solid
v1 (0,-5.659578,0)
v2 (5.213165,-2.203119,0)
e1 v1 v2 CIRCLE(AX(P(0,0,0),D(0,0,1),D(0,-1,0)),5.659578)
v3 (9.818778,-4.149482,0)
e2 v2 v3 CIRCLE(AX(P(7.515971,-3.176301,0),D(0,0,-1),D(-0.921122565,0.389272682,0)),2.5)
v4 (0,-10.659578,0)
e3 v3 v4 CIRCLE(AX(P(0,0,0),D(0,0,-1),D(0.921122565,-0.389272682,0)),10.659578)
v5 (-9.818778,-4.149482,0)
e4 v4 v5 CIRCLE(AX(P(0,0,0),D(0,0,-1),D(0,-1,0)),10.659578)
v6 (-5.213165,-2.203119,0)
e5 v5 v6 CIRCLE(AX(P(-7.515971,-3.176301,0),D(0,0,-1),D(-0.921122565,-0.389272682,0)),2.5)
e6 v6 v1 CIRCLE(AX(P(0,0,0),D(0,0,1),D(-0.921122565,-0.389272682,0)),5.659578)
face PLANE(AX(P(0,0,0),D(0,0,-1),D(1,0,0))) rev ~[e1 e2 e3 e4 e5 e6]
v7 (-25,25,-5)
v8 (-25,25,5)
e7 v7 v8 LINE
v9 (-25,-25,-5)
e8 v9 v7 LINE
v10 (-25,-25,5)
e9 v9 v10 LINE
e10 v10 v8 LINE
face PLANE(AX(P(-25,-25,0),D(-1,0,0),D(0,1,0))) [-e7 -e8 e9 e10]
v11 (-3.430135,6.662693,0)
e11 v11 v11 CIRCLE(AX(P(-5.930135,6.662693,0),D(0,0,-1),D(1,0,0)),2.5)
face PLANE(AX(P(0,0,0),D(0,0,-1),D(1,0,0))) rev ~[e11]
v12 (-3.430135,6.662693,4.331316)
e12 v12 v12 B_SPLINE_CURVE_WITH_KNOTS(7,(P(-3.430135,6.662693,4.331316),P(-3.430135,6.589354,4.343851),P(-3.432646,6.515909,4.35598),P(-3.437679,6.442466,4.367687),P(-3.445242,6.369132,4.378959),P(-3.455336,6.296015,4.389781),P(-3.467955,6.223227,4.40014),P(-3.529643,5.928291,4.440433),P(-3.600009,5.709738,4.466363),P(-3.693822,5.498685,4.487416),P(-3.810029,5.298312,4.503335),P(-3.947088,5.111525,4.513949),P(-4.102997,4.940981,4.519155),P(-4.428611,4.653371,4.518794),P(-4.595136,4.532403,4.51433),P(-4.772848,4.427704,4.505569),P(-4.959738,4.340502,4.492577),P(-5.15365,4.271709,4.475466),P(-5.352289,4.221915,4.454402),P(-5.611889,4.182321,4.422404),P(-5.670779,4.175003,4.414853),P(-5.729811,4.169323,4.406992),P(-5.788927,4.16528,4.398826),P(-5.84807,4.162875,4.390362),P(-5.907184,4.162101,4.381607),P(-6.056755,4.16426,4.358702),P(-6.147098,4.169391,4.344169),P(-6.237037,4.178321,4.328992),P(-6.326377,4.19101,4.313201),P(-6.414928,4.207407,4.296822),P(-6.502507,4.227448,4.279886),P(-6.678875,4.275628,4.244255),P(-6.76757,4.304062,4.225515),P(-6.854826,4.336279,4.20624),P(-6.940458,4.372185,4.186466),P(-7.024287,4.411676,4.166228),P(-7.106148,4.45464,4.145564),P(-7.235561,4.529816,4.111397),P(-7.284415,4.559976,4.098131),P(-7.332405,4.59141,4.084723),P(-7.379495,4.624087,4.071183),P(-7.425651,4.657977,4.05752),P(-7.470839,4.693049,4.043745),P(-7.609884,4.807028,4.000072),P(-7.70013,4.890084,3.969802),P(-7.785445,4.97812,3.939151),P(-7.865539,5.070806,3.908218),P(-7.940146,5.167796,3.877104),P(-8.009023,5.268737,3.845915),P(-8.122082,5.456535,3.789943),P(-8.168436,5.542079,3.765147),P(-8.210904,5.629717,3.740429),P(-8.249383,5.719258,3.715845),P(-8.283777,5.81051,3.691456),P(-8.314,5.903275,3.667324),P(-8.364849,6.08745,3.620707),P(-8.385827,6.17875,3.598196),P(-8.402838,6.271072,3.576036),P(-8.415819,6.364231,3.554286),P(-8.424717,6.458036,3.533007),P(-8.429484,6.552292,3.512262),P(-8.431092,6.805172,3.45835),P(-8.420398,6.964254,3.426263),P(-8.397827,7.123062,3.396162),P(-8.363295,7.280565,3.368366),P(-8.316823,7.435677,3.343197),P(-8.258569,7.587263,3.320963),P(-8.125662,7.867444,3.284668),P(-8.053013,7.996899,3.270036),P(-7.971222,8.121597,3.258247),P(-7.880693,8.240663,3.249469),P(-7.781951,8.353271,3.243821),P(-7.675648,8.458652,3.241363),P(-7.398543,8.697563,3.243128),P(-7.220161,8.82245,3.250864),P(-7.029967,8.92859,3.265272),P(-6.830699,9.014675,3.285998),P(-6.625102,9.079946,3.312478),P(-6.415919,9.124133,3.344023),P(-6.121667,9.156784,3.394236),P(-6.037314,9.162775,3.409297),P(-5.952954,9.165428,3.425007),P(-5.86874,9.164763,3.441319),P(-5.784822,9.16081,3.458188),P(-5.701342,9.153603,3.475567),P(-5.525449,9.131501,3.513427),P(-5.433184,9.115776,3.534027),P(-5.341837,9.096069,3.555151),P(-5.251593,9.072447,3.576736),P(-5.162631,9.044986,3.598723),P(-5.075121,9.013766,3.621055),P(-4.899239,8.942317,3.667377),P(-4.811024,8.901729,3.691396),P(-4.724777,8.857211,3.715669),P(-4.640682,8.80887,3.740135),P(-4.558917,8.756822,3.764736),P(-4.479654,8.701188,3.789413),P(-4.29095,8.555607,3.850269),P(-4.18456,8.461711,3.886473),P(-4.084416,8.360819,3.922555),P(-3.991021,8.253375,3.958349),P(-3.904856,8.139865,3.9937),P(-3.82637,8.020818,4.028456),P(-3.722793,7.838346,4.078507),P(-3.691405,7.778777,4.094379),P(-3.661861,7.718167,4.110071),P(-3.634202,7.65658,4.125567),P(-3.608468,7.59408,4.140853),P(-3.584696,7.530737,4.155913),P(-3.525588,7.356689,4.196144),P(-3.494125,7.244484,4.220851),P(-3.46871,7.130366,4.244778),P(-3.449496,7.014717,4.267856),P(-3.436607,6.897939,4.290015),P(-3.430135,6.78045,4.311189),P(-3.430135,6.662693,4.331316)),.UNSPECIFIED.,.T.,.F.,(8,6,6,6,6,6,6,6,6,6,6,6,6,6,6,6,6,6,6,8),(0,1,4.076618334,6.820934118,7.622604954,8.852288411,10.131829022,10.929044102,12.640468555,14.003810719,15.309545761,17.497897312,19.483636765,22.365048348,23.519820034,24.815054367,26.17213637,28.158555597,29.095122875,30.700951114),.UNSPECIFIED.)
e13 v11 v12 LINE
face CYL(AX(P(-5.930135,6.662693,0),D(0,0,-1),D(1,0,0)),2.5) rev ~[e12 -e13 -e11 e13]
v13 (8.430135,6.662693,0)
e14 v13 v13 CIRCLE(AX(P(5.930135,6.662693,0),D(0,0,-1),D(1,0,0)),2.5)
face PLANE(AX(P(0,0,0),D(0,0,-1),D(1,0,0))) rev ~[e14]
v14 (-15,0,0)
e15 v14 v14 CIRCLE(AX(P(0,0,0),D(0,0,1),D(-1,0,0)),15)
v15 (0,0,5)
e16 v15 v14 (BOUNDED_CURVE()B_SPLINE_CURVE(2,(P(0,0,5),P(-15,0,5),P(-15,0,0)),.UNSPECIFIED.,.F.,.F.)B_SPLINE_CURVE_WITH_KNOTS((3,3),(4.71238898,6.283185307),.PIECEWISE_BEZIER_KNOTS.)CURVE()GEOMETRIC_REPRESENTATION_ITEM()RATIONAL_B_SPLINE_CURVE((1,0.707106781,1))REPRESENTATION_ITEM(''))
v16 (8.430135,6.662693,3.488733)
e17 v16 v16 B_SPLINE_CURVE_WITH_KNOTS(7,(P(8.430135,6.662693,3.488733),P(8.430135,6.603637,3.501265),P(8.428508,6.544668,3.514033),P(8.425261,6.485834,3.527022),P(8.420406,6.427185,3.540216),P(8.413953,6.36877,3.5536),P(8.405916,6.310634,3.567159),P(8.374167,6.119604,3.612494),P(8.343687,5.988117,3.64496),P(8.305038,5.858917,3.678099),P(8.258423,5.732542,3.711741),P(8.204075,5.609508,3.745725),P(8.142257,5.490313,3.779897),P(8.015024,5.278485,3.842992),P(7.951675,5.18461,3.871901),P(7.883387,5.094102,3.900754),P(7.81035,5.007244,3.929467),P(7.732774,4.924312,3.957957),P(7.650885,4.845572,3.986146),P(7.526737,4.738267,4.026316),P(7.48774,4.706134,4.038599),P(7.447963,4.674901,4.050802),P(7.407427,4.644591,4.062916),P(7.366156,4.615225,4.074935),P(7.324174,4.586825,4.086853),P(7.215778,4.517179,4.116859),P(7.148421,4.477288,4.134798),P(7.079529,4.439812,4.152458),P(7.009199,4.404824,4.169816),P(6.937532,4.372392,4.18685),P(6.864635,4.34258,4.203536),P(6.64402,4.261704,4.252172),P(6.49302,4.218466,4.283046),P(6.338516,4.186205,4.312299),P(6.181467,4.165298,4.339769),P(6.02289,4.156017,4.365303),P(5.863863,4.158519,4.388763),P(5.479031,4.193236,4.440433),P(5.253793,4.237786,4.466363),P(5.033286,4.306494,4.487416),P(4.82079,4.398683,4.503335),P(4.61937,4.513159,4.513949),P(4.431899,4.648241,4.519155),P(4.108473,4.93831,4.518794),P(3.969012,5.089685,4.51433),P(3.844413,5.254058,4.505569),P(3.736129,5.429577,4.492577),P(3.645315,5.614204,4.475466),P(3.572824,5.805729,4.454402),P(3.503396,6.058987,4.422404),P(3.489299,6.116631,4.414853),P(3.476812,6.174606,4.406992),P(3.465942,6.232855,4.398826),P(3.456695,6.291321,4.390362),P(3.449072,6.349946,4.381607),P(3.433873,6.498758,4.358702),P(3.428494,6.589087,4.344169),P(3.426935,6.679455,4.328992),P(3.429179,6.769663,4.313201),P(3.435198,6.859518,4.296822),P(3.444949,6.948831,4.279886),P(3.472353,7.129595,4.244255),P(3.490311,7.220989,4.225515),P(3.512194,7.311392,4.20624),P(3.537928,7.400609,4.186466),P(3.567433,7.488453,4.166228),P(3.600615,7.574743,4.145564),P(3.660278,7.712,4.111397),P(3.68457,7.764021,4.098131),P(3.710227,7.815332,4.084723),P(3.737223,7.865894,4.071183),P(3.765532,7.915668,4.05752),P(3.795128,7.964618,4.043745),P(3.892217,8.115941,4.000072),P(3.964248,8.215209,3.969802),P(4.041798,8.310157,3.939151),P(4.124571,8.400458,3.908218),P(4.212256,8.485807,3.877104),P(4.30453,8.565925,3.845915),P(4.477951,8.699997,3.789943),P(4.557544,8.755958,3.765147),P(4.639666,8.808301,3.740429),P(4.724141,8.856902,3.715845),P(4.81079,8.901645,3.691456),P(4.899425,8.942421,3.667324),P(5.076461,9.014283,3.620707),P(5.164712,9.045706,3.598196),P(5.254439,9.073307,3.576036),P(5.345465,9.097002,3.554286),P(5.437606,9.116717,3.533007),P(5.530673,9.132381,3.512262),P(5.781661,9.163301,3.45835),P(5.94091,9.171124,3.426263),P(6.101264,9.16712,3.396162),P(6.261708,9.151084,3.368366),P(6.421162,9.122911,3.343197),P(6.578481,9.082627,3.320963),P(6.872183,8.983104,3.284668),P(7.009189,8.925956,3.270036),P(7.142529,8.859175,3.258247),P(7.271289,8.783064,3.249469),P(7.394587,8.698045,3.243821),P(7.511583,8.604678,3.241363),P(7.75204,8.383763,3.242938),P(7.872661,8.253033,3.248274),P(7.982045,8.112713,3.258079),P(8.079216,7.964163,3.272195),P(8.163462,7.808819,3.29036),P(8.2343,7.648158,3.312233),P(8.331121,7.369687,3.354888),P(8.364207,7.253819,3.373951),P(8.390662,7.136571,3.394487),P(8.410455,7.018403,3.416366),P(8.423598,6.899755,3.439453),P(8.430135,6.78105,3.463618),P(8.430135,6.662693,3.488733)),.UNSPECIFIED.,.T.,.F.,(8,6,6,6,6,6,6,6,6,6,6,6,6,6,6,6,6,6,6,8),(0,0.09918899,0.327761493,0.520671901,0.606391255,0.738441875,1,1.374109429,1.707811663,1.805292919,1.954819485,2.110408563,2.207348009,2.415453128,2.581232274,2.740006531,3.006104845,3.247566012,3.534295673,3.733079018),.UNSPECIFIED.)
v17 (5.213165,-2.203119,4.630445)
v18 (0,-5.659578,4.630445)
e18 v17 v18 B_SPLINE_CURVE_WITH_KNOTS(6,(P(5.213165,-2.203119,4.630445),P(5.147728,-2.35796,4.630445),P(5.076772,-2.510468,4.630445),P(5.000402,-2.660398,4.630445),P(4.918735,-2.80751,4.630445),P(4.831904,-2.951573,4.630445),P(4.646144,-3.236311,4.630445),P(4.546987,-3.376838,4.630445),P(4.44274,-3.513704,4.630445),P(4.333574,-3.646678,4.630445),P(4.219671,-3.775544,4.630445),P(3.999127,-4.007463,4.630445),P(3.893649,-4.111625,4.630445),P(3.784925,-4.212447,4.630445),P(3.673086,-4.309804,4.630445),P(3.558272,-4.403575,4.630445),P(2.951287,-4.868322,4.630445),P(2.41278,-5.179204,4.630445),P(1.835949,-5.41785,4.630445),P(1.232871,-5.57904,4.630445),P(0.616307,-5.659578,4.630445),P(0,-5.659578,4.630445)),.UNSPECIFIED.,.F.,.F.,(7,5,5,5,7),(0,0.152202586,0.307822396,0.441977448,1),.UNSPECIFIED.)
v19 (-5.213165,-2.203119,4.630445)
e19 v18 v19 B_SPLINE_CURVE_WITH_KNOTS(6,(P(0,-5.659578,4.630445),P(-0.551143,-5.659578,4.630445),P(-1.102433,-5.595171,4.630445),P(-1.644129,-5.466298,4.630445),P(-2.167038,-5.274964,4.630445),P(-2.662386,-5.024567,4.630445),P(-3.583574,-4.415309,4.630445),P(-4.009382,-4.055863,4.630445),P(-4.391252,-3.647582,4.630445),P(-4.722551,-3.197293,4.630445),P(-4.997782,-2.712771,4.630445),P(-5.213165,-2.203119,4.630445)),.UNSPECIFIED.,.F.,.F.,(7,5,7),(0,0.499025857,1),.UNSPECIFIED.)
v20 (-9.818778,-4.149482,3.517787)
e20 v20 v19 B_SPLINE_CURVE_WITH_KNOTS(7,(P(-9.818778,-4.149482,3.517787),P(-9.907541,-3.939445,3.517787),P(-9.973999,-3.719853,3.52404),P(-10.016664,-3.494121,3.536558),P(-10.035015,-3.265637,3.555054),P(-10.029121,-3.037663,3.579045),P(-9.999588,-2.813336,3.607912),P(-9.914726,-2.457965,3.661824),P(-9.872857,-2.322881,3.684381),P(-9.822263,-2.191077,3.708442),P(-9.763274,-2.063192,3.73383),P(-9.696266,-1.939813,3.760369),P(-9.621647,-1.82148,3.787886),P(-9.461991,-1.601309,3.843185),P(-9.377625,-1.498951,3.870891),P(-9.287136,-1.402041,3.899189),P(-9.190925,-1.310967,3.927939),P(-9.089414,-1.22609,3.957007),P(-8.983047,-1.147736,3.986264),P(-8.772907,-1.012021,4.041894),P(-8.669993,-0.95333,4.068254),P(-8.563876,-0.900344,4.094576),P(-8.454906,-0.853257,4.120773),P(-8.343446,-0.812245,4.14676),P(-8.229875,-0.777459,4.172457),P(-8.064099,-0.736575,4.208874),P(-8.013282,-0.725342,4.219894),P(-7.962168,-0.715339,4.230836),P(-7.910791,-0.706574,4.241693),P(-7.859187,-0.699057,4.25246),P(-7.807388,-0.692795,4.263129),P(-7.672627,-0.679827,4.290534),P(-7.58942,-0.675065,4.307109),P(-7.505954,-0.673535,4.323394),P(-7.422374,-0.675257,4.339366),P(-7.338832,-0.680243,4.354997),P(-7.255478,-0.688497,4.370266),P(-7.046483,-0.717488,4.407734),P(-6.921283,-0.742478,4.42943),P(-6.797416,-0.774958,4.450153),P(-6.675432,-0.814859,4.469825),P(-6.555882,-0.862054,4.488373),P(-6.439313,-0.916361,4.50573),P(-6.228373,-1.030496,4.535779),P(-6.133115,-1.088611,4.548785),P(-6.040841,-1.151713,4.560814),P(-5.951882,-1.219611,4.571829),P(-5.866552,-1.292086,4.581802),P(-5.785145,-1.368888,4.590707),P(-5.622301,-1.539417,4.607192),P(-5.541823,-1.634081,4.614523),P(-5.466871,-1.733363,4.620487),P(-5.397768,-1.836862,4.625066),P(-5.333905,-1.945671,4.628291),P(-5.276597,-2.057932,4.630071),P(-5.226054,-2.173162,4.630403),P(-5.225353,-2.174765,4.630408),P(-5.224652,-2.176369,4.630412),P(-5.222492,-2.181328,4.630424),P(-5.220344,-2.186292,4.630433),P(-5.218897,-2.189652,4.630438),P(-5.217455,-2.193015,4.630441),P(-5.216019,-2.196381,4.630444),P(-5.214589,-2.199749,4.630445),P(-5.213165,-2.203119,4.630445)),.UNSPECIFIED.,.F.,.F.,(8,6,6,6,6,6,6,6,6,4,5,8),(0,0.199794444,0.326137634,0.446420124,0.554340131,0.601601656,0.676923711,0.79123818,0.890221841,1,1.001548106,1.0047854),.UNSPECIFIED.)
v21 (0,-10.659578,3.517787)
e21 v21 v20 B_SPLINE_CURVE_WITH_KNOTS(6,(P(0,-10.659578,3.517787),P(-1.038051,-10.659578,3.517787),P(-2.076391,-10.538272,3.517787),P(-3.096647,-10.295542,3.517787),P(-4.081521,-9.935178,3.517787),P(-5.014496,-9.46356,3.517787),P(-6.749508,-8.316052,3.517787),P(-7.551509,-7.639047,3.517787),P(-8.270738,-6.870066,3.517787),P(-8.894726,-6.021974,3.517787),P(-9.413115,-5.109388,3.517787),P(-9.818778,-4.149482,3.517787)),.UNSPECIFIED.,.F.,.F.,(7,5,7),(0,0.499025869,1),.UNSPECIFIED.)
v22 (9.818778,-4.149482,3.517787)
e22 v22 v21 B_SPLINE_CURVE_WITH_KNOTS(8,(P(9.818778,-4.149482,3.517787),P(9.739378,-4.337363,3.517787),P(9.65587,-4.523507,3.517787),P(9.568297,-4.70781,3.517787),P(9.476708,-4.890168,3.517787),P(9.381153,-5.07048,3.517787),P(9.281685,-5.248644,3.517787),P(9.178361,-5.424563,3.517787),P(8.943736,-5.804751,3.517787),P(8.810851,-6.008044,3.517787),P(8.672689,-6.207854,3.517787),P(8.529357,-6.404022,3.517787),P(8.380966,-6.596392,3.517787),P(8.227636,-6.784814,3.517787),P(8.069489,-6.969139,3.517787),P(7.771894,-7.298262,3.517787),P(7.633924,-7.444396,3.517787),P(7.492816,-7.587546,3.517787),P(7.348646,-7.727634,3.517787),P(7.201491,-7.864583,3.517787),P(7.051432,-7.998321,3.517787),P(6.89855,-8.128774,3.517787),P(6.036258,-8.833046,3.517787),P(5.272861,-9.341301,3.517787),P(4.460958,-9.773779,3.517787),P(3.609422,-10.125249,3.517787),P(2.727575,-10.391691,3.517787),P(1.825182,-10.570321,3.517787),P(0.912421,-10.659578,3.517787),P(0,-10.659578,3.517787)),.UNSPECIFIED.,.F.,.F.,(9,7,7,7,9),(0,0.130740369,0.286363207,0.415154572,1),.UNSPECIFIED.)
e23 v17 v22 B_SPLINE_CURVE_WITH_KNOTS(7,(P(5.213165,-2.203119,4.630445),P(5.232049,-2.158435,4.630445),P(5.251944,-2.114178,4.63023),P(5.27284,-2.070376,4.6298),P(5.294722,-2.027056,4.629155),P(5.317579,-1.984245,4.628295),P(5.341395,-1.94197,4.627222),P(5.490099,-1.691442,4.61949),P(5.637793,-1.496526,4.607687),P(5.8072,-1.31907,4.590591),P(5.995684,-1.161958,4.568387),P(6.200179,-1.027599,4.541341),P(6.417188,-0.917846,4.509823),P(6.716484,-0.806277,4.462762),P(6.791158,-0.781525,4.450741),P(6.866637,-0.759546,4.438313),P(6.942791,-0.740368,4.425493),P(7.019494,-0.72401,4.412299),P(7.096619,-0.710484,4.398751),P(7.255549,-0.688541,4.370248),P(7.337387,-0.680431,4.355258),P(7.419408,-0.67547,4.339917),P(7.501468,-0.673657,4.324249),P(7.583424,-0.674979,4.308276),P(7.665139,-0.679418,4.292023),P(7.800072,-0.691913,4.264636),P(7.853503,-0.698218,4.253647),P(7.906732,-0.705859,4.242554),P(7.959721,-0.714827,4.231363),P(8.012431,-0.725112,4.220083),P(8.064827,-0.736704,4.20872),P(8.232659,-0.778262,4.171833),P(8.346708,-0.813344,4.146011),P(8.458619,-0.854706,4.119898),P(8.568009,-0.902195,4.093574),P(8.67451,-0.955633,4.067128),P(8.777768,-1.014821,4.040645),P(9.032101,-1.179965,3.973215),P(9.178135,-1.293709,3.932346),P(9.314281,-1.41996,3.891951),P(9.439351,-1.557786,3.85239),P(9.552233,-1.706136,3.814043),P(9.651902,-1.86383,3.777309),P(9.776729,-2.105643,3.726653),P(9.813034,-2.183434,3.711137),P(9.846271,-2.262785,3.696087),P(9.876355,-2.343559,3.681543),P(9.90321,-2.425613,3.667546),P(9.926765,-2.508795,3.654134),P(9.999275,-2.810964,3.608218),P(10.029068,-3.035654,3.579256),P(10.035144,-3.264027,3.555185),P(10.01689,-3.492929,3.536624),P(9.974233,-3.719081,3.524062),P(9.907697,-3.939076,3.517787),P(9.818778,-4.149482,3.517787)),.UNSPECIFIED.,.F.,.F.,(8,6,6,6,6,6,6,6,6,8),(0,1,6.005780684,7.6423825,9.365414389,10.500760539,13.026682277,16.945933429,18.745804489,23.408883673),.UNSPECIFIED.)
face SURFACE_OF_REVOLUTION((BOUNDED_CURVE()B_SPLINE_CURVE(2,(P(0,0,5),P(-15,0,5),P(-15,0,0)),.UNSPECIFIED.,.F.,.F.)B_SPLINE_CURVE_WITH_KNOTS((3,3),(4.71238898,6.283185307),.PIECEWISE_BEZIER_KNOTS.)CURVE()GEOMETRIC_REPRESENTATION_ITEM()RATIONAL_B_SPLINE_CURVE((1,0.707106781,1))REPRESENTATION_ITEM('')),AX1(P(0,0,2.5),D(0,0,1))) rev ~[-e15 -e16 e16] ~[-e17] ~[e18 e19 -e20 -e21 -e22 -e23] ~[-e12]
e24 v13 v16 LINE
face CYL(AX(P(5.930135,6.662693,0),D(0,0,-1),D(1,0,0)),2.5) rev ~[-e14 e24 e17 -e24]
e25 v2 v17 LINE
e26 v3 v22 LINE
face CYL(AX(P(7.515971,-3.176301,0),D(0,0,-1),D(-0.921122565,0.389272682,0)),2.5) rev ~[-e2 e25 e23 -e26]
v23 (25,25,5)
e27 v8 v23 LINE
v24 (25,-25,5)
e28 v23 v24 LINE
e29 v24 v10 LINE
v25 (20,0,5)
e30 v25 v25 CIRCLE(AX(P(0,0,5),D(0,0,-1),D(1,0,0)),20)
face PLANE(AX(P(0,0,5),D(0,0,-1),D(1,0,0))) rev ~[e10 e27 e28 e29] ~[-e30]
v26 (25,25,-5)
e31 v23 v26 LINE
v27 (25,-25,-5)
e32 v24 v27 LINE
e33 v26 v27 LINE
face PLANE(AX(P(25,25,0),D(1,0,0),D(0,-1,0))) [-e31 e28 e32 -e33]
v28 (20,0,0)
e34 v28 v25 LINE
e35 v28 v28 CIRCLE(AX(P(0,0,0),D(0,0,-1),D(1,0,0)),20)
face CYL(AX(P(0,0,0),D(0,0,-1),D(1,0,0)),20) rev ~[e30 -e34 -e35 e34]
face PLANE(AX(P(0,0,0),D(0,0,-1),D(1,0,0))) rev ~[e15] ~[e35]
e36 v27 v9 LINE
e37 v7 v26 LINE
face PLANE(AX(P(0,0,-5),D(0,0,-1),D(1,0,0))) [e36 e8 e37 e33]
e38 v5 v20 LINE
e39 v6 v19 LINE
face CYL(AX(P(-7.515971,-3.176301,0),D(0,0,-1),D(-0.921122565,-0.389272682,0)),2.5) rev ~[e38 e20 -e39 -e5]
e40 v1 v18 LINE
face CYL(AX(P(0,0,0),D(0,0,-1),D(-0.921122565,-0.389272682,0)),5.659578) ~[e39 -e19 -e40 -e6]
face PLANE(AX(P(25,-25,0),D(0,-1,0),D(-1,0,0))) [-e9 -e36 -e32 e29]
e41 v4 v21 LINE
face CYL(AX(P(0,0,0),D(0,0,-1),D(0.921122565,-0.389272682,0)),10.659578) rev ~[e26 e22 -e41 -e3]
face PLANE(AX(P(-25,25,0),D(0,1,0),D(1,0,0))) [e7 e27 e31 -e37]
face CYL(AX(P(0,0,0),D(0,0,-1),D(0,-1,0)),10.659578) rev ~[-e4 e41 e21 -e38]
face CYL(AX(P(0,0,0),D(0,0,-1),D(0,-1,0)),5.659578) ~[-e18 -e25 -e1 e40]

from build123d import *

# Parameters (mm, degrees)
F2_R     = 2.5
F3_DEPTH = 25
F4_R     = 20
F4_R_2   = 15
F4_R_3   = 2.5
F5_DEPTH = 5
F6_DEPTH = 5


with BuildPart() as f1:
    # F0 (on Front) → F1 (revolve)
    with BuildSketch(Plane.XZ):
        with BuildLine():
            Line((0, 0), (0, 5))
            add(Edge.make_bspline(
                [(0, 5), (-15, 5), (-15, 0)],
                knots=[4.7123889804, 4.7123889804, 4.7123889804, 6.2831853072, 6.2831853072, 6.2831853072], degree=2, weights=[1, 0.7071067812, 1]))
            Line((-15, 0), (0, 0))
        make_face()
    revolve(axis=Axis((0, 0, 2.5), (0, 0, 1)))

    # F2 (on face) → F3 (cut)
    with BuildSketch(Plane(origin=(0, 0, 0), x_dir=(1, 0, 0), z_dir=(0, 0, -1))):
        with Locations((5.9301354922, -6.6626928747)):
            Circle(F2_R)
        with BuildLine():
            ThreePointArc((-5.2131647244, 2.2031189874), (-3.1274667568, 4.7169663346), (0, 5.6595776977))
            ThreePointArc((0, 5.6595776977), (3.1274667568, 4.7169663346), (5.2131647244, 2.2031189874))
            ThreePointArc((5.2131647244, 2.2031189874), (8.4891528404, 0.8734942796), (9.8187775482, 4.1494823956))
            ThreePointArc((9.8187775482, 4.1494823956), (5.8904527284, 8.8842086506), (0, 10.6595776977))
            ThreePointArc((0, 10.6595776977), (-5.8904527284, 8.8842086506), (-9.8187775482, 4.1494823956))
            ThreePointArc((-9.8187775482, 4.1494823956), (-8.4891528404, 0.8734942796), (-5.2131647244, 2.2031189874))
        make_face()
        with Locations((-5.9301354922, -6.6626928747)):
            Circle(F2_R)
    extrude(amount=-F3_DEPTH, mode=Mode.SUBTRACT)

    # F4 (on face) → F5 (join)
    with BuildSketch(Plane(origin=(0, 0, 0), x_dir=(1, 0, 0), z_dir=(0, 0, -1))):
        Polygon((-25, -25), (0, -25), (25, -25), (25, 0), (25, 25), (0, 25), (-25, 25), (-25, 0), align=None)
        Circle(F4_R, mode=Mode.SUBTRACT)
        Circle(F4_R)
        Circle(F4_R_2, mode=Mode.SUBTRACT)
        Circle(F4_R_2)
        with Locations((-5.9301354922, -6.6626928747)):
            Circle(F4_R_3, mode=Mode.SUBTRACT)
        with Locations((5.9301354922, -6.6626928747)):
            Circle(F4_R_3, mode=Mode.SUBTRACT)
        with BuildLine():
            ThreePointArc((-5.2131647244, 2.2031189874), (-8.4891528404, 0.8734942796), (-9.8187775482, 4.1494823956))
            ThreePointArc((-9.8187775482, 4.1494823956), (0, 10.6595776977), (9.8187775482, 4.1494823956))
            ThreePointArc((9.8187775482, 4.1494823956), (8.4891528404, 0.8734942796), (5.2131647244, 2.2031189874))
            ThreePointArc((5.2131647244, 2.2031189874), (0, 5.6595776977), (-5.2131647244, 2.2031189874))
        make_face(mode=Mode.SUBTRACT)
        with BuildLine():
            ThreePointArc((9.8187775482, 4.1494823956), (0, 10.6595776977), (-9.8187775482, 4.1494823956))
            ThreePointArc((-9.8187775482, 4.1494823956), (-8.4891528404, 0.8734942796), (-5.2131647244, 2.2031189874))
            ThreePointArc((-5.2131647244, 2.2031189874), (0, 5.6595776977), (5.2131647244, 2.2031189874))
            ThreePointArc((5.2131647244, 2.2031189874), (8.4891528404, 0.8734942796), (9.8187775482, 4.1494823956))
        make_face()
        with Locations((5.9301354922, -6.6626928747)):
            Circle(F4_R_3)
        with Locations((-5.9301354922, -6.6626928747)):
            Circle(F4_R_3)
    extrude(amount=F5_DEPTH)

    # F4 (on face) → F6 (join)
    with BuildSketch(Plane(origin=(0, 0, 0), x_dir=(1, 0, 0), z_dir=(0, 0, -1))):
        Polygon((-25, -25), (0, -25), (25, -25), (25, 0), (25, 25), (0, 25), (-25, 25), (-25, 0), align=None)
        Circle(F4_R, mode=Mode.SUBTRACT)
    extrude(amount=-F6_DEPTH)


solid = f1.part
